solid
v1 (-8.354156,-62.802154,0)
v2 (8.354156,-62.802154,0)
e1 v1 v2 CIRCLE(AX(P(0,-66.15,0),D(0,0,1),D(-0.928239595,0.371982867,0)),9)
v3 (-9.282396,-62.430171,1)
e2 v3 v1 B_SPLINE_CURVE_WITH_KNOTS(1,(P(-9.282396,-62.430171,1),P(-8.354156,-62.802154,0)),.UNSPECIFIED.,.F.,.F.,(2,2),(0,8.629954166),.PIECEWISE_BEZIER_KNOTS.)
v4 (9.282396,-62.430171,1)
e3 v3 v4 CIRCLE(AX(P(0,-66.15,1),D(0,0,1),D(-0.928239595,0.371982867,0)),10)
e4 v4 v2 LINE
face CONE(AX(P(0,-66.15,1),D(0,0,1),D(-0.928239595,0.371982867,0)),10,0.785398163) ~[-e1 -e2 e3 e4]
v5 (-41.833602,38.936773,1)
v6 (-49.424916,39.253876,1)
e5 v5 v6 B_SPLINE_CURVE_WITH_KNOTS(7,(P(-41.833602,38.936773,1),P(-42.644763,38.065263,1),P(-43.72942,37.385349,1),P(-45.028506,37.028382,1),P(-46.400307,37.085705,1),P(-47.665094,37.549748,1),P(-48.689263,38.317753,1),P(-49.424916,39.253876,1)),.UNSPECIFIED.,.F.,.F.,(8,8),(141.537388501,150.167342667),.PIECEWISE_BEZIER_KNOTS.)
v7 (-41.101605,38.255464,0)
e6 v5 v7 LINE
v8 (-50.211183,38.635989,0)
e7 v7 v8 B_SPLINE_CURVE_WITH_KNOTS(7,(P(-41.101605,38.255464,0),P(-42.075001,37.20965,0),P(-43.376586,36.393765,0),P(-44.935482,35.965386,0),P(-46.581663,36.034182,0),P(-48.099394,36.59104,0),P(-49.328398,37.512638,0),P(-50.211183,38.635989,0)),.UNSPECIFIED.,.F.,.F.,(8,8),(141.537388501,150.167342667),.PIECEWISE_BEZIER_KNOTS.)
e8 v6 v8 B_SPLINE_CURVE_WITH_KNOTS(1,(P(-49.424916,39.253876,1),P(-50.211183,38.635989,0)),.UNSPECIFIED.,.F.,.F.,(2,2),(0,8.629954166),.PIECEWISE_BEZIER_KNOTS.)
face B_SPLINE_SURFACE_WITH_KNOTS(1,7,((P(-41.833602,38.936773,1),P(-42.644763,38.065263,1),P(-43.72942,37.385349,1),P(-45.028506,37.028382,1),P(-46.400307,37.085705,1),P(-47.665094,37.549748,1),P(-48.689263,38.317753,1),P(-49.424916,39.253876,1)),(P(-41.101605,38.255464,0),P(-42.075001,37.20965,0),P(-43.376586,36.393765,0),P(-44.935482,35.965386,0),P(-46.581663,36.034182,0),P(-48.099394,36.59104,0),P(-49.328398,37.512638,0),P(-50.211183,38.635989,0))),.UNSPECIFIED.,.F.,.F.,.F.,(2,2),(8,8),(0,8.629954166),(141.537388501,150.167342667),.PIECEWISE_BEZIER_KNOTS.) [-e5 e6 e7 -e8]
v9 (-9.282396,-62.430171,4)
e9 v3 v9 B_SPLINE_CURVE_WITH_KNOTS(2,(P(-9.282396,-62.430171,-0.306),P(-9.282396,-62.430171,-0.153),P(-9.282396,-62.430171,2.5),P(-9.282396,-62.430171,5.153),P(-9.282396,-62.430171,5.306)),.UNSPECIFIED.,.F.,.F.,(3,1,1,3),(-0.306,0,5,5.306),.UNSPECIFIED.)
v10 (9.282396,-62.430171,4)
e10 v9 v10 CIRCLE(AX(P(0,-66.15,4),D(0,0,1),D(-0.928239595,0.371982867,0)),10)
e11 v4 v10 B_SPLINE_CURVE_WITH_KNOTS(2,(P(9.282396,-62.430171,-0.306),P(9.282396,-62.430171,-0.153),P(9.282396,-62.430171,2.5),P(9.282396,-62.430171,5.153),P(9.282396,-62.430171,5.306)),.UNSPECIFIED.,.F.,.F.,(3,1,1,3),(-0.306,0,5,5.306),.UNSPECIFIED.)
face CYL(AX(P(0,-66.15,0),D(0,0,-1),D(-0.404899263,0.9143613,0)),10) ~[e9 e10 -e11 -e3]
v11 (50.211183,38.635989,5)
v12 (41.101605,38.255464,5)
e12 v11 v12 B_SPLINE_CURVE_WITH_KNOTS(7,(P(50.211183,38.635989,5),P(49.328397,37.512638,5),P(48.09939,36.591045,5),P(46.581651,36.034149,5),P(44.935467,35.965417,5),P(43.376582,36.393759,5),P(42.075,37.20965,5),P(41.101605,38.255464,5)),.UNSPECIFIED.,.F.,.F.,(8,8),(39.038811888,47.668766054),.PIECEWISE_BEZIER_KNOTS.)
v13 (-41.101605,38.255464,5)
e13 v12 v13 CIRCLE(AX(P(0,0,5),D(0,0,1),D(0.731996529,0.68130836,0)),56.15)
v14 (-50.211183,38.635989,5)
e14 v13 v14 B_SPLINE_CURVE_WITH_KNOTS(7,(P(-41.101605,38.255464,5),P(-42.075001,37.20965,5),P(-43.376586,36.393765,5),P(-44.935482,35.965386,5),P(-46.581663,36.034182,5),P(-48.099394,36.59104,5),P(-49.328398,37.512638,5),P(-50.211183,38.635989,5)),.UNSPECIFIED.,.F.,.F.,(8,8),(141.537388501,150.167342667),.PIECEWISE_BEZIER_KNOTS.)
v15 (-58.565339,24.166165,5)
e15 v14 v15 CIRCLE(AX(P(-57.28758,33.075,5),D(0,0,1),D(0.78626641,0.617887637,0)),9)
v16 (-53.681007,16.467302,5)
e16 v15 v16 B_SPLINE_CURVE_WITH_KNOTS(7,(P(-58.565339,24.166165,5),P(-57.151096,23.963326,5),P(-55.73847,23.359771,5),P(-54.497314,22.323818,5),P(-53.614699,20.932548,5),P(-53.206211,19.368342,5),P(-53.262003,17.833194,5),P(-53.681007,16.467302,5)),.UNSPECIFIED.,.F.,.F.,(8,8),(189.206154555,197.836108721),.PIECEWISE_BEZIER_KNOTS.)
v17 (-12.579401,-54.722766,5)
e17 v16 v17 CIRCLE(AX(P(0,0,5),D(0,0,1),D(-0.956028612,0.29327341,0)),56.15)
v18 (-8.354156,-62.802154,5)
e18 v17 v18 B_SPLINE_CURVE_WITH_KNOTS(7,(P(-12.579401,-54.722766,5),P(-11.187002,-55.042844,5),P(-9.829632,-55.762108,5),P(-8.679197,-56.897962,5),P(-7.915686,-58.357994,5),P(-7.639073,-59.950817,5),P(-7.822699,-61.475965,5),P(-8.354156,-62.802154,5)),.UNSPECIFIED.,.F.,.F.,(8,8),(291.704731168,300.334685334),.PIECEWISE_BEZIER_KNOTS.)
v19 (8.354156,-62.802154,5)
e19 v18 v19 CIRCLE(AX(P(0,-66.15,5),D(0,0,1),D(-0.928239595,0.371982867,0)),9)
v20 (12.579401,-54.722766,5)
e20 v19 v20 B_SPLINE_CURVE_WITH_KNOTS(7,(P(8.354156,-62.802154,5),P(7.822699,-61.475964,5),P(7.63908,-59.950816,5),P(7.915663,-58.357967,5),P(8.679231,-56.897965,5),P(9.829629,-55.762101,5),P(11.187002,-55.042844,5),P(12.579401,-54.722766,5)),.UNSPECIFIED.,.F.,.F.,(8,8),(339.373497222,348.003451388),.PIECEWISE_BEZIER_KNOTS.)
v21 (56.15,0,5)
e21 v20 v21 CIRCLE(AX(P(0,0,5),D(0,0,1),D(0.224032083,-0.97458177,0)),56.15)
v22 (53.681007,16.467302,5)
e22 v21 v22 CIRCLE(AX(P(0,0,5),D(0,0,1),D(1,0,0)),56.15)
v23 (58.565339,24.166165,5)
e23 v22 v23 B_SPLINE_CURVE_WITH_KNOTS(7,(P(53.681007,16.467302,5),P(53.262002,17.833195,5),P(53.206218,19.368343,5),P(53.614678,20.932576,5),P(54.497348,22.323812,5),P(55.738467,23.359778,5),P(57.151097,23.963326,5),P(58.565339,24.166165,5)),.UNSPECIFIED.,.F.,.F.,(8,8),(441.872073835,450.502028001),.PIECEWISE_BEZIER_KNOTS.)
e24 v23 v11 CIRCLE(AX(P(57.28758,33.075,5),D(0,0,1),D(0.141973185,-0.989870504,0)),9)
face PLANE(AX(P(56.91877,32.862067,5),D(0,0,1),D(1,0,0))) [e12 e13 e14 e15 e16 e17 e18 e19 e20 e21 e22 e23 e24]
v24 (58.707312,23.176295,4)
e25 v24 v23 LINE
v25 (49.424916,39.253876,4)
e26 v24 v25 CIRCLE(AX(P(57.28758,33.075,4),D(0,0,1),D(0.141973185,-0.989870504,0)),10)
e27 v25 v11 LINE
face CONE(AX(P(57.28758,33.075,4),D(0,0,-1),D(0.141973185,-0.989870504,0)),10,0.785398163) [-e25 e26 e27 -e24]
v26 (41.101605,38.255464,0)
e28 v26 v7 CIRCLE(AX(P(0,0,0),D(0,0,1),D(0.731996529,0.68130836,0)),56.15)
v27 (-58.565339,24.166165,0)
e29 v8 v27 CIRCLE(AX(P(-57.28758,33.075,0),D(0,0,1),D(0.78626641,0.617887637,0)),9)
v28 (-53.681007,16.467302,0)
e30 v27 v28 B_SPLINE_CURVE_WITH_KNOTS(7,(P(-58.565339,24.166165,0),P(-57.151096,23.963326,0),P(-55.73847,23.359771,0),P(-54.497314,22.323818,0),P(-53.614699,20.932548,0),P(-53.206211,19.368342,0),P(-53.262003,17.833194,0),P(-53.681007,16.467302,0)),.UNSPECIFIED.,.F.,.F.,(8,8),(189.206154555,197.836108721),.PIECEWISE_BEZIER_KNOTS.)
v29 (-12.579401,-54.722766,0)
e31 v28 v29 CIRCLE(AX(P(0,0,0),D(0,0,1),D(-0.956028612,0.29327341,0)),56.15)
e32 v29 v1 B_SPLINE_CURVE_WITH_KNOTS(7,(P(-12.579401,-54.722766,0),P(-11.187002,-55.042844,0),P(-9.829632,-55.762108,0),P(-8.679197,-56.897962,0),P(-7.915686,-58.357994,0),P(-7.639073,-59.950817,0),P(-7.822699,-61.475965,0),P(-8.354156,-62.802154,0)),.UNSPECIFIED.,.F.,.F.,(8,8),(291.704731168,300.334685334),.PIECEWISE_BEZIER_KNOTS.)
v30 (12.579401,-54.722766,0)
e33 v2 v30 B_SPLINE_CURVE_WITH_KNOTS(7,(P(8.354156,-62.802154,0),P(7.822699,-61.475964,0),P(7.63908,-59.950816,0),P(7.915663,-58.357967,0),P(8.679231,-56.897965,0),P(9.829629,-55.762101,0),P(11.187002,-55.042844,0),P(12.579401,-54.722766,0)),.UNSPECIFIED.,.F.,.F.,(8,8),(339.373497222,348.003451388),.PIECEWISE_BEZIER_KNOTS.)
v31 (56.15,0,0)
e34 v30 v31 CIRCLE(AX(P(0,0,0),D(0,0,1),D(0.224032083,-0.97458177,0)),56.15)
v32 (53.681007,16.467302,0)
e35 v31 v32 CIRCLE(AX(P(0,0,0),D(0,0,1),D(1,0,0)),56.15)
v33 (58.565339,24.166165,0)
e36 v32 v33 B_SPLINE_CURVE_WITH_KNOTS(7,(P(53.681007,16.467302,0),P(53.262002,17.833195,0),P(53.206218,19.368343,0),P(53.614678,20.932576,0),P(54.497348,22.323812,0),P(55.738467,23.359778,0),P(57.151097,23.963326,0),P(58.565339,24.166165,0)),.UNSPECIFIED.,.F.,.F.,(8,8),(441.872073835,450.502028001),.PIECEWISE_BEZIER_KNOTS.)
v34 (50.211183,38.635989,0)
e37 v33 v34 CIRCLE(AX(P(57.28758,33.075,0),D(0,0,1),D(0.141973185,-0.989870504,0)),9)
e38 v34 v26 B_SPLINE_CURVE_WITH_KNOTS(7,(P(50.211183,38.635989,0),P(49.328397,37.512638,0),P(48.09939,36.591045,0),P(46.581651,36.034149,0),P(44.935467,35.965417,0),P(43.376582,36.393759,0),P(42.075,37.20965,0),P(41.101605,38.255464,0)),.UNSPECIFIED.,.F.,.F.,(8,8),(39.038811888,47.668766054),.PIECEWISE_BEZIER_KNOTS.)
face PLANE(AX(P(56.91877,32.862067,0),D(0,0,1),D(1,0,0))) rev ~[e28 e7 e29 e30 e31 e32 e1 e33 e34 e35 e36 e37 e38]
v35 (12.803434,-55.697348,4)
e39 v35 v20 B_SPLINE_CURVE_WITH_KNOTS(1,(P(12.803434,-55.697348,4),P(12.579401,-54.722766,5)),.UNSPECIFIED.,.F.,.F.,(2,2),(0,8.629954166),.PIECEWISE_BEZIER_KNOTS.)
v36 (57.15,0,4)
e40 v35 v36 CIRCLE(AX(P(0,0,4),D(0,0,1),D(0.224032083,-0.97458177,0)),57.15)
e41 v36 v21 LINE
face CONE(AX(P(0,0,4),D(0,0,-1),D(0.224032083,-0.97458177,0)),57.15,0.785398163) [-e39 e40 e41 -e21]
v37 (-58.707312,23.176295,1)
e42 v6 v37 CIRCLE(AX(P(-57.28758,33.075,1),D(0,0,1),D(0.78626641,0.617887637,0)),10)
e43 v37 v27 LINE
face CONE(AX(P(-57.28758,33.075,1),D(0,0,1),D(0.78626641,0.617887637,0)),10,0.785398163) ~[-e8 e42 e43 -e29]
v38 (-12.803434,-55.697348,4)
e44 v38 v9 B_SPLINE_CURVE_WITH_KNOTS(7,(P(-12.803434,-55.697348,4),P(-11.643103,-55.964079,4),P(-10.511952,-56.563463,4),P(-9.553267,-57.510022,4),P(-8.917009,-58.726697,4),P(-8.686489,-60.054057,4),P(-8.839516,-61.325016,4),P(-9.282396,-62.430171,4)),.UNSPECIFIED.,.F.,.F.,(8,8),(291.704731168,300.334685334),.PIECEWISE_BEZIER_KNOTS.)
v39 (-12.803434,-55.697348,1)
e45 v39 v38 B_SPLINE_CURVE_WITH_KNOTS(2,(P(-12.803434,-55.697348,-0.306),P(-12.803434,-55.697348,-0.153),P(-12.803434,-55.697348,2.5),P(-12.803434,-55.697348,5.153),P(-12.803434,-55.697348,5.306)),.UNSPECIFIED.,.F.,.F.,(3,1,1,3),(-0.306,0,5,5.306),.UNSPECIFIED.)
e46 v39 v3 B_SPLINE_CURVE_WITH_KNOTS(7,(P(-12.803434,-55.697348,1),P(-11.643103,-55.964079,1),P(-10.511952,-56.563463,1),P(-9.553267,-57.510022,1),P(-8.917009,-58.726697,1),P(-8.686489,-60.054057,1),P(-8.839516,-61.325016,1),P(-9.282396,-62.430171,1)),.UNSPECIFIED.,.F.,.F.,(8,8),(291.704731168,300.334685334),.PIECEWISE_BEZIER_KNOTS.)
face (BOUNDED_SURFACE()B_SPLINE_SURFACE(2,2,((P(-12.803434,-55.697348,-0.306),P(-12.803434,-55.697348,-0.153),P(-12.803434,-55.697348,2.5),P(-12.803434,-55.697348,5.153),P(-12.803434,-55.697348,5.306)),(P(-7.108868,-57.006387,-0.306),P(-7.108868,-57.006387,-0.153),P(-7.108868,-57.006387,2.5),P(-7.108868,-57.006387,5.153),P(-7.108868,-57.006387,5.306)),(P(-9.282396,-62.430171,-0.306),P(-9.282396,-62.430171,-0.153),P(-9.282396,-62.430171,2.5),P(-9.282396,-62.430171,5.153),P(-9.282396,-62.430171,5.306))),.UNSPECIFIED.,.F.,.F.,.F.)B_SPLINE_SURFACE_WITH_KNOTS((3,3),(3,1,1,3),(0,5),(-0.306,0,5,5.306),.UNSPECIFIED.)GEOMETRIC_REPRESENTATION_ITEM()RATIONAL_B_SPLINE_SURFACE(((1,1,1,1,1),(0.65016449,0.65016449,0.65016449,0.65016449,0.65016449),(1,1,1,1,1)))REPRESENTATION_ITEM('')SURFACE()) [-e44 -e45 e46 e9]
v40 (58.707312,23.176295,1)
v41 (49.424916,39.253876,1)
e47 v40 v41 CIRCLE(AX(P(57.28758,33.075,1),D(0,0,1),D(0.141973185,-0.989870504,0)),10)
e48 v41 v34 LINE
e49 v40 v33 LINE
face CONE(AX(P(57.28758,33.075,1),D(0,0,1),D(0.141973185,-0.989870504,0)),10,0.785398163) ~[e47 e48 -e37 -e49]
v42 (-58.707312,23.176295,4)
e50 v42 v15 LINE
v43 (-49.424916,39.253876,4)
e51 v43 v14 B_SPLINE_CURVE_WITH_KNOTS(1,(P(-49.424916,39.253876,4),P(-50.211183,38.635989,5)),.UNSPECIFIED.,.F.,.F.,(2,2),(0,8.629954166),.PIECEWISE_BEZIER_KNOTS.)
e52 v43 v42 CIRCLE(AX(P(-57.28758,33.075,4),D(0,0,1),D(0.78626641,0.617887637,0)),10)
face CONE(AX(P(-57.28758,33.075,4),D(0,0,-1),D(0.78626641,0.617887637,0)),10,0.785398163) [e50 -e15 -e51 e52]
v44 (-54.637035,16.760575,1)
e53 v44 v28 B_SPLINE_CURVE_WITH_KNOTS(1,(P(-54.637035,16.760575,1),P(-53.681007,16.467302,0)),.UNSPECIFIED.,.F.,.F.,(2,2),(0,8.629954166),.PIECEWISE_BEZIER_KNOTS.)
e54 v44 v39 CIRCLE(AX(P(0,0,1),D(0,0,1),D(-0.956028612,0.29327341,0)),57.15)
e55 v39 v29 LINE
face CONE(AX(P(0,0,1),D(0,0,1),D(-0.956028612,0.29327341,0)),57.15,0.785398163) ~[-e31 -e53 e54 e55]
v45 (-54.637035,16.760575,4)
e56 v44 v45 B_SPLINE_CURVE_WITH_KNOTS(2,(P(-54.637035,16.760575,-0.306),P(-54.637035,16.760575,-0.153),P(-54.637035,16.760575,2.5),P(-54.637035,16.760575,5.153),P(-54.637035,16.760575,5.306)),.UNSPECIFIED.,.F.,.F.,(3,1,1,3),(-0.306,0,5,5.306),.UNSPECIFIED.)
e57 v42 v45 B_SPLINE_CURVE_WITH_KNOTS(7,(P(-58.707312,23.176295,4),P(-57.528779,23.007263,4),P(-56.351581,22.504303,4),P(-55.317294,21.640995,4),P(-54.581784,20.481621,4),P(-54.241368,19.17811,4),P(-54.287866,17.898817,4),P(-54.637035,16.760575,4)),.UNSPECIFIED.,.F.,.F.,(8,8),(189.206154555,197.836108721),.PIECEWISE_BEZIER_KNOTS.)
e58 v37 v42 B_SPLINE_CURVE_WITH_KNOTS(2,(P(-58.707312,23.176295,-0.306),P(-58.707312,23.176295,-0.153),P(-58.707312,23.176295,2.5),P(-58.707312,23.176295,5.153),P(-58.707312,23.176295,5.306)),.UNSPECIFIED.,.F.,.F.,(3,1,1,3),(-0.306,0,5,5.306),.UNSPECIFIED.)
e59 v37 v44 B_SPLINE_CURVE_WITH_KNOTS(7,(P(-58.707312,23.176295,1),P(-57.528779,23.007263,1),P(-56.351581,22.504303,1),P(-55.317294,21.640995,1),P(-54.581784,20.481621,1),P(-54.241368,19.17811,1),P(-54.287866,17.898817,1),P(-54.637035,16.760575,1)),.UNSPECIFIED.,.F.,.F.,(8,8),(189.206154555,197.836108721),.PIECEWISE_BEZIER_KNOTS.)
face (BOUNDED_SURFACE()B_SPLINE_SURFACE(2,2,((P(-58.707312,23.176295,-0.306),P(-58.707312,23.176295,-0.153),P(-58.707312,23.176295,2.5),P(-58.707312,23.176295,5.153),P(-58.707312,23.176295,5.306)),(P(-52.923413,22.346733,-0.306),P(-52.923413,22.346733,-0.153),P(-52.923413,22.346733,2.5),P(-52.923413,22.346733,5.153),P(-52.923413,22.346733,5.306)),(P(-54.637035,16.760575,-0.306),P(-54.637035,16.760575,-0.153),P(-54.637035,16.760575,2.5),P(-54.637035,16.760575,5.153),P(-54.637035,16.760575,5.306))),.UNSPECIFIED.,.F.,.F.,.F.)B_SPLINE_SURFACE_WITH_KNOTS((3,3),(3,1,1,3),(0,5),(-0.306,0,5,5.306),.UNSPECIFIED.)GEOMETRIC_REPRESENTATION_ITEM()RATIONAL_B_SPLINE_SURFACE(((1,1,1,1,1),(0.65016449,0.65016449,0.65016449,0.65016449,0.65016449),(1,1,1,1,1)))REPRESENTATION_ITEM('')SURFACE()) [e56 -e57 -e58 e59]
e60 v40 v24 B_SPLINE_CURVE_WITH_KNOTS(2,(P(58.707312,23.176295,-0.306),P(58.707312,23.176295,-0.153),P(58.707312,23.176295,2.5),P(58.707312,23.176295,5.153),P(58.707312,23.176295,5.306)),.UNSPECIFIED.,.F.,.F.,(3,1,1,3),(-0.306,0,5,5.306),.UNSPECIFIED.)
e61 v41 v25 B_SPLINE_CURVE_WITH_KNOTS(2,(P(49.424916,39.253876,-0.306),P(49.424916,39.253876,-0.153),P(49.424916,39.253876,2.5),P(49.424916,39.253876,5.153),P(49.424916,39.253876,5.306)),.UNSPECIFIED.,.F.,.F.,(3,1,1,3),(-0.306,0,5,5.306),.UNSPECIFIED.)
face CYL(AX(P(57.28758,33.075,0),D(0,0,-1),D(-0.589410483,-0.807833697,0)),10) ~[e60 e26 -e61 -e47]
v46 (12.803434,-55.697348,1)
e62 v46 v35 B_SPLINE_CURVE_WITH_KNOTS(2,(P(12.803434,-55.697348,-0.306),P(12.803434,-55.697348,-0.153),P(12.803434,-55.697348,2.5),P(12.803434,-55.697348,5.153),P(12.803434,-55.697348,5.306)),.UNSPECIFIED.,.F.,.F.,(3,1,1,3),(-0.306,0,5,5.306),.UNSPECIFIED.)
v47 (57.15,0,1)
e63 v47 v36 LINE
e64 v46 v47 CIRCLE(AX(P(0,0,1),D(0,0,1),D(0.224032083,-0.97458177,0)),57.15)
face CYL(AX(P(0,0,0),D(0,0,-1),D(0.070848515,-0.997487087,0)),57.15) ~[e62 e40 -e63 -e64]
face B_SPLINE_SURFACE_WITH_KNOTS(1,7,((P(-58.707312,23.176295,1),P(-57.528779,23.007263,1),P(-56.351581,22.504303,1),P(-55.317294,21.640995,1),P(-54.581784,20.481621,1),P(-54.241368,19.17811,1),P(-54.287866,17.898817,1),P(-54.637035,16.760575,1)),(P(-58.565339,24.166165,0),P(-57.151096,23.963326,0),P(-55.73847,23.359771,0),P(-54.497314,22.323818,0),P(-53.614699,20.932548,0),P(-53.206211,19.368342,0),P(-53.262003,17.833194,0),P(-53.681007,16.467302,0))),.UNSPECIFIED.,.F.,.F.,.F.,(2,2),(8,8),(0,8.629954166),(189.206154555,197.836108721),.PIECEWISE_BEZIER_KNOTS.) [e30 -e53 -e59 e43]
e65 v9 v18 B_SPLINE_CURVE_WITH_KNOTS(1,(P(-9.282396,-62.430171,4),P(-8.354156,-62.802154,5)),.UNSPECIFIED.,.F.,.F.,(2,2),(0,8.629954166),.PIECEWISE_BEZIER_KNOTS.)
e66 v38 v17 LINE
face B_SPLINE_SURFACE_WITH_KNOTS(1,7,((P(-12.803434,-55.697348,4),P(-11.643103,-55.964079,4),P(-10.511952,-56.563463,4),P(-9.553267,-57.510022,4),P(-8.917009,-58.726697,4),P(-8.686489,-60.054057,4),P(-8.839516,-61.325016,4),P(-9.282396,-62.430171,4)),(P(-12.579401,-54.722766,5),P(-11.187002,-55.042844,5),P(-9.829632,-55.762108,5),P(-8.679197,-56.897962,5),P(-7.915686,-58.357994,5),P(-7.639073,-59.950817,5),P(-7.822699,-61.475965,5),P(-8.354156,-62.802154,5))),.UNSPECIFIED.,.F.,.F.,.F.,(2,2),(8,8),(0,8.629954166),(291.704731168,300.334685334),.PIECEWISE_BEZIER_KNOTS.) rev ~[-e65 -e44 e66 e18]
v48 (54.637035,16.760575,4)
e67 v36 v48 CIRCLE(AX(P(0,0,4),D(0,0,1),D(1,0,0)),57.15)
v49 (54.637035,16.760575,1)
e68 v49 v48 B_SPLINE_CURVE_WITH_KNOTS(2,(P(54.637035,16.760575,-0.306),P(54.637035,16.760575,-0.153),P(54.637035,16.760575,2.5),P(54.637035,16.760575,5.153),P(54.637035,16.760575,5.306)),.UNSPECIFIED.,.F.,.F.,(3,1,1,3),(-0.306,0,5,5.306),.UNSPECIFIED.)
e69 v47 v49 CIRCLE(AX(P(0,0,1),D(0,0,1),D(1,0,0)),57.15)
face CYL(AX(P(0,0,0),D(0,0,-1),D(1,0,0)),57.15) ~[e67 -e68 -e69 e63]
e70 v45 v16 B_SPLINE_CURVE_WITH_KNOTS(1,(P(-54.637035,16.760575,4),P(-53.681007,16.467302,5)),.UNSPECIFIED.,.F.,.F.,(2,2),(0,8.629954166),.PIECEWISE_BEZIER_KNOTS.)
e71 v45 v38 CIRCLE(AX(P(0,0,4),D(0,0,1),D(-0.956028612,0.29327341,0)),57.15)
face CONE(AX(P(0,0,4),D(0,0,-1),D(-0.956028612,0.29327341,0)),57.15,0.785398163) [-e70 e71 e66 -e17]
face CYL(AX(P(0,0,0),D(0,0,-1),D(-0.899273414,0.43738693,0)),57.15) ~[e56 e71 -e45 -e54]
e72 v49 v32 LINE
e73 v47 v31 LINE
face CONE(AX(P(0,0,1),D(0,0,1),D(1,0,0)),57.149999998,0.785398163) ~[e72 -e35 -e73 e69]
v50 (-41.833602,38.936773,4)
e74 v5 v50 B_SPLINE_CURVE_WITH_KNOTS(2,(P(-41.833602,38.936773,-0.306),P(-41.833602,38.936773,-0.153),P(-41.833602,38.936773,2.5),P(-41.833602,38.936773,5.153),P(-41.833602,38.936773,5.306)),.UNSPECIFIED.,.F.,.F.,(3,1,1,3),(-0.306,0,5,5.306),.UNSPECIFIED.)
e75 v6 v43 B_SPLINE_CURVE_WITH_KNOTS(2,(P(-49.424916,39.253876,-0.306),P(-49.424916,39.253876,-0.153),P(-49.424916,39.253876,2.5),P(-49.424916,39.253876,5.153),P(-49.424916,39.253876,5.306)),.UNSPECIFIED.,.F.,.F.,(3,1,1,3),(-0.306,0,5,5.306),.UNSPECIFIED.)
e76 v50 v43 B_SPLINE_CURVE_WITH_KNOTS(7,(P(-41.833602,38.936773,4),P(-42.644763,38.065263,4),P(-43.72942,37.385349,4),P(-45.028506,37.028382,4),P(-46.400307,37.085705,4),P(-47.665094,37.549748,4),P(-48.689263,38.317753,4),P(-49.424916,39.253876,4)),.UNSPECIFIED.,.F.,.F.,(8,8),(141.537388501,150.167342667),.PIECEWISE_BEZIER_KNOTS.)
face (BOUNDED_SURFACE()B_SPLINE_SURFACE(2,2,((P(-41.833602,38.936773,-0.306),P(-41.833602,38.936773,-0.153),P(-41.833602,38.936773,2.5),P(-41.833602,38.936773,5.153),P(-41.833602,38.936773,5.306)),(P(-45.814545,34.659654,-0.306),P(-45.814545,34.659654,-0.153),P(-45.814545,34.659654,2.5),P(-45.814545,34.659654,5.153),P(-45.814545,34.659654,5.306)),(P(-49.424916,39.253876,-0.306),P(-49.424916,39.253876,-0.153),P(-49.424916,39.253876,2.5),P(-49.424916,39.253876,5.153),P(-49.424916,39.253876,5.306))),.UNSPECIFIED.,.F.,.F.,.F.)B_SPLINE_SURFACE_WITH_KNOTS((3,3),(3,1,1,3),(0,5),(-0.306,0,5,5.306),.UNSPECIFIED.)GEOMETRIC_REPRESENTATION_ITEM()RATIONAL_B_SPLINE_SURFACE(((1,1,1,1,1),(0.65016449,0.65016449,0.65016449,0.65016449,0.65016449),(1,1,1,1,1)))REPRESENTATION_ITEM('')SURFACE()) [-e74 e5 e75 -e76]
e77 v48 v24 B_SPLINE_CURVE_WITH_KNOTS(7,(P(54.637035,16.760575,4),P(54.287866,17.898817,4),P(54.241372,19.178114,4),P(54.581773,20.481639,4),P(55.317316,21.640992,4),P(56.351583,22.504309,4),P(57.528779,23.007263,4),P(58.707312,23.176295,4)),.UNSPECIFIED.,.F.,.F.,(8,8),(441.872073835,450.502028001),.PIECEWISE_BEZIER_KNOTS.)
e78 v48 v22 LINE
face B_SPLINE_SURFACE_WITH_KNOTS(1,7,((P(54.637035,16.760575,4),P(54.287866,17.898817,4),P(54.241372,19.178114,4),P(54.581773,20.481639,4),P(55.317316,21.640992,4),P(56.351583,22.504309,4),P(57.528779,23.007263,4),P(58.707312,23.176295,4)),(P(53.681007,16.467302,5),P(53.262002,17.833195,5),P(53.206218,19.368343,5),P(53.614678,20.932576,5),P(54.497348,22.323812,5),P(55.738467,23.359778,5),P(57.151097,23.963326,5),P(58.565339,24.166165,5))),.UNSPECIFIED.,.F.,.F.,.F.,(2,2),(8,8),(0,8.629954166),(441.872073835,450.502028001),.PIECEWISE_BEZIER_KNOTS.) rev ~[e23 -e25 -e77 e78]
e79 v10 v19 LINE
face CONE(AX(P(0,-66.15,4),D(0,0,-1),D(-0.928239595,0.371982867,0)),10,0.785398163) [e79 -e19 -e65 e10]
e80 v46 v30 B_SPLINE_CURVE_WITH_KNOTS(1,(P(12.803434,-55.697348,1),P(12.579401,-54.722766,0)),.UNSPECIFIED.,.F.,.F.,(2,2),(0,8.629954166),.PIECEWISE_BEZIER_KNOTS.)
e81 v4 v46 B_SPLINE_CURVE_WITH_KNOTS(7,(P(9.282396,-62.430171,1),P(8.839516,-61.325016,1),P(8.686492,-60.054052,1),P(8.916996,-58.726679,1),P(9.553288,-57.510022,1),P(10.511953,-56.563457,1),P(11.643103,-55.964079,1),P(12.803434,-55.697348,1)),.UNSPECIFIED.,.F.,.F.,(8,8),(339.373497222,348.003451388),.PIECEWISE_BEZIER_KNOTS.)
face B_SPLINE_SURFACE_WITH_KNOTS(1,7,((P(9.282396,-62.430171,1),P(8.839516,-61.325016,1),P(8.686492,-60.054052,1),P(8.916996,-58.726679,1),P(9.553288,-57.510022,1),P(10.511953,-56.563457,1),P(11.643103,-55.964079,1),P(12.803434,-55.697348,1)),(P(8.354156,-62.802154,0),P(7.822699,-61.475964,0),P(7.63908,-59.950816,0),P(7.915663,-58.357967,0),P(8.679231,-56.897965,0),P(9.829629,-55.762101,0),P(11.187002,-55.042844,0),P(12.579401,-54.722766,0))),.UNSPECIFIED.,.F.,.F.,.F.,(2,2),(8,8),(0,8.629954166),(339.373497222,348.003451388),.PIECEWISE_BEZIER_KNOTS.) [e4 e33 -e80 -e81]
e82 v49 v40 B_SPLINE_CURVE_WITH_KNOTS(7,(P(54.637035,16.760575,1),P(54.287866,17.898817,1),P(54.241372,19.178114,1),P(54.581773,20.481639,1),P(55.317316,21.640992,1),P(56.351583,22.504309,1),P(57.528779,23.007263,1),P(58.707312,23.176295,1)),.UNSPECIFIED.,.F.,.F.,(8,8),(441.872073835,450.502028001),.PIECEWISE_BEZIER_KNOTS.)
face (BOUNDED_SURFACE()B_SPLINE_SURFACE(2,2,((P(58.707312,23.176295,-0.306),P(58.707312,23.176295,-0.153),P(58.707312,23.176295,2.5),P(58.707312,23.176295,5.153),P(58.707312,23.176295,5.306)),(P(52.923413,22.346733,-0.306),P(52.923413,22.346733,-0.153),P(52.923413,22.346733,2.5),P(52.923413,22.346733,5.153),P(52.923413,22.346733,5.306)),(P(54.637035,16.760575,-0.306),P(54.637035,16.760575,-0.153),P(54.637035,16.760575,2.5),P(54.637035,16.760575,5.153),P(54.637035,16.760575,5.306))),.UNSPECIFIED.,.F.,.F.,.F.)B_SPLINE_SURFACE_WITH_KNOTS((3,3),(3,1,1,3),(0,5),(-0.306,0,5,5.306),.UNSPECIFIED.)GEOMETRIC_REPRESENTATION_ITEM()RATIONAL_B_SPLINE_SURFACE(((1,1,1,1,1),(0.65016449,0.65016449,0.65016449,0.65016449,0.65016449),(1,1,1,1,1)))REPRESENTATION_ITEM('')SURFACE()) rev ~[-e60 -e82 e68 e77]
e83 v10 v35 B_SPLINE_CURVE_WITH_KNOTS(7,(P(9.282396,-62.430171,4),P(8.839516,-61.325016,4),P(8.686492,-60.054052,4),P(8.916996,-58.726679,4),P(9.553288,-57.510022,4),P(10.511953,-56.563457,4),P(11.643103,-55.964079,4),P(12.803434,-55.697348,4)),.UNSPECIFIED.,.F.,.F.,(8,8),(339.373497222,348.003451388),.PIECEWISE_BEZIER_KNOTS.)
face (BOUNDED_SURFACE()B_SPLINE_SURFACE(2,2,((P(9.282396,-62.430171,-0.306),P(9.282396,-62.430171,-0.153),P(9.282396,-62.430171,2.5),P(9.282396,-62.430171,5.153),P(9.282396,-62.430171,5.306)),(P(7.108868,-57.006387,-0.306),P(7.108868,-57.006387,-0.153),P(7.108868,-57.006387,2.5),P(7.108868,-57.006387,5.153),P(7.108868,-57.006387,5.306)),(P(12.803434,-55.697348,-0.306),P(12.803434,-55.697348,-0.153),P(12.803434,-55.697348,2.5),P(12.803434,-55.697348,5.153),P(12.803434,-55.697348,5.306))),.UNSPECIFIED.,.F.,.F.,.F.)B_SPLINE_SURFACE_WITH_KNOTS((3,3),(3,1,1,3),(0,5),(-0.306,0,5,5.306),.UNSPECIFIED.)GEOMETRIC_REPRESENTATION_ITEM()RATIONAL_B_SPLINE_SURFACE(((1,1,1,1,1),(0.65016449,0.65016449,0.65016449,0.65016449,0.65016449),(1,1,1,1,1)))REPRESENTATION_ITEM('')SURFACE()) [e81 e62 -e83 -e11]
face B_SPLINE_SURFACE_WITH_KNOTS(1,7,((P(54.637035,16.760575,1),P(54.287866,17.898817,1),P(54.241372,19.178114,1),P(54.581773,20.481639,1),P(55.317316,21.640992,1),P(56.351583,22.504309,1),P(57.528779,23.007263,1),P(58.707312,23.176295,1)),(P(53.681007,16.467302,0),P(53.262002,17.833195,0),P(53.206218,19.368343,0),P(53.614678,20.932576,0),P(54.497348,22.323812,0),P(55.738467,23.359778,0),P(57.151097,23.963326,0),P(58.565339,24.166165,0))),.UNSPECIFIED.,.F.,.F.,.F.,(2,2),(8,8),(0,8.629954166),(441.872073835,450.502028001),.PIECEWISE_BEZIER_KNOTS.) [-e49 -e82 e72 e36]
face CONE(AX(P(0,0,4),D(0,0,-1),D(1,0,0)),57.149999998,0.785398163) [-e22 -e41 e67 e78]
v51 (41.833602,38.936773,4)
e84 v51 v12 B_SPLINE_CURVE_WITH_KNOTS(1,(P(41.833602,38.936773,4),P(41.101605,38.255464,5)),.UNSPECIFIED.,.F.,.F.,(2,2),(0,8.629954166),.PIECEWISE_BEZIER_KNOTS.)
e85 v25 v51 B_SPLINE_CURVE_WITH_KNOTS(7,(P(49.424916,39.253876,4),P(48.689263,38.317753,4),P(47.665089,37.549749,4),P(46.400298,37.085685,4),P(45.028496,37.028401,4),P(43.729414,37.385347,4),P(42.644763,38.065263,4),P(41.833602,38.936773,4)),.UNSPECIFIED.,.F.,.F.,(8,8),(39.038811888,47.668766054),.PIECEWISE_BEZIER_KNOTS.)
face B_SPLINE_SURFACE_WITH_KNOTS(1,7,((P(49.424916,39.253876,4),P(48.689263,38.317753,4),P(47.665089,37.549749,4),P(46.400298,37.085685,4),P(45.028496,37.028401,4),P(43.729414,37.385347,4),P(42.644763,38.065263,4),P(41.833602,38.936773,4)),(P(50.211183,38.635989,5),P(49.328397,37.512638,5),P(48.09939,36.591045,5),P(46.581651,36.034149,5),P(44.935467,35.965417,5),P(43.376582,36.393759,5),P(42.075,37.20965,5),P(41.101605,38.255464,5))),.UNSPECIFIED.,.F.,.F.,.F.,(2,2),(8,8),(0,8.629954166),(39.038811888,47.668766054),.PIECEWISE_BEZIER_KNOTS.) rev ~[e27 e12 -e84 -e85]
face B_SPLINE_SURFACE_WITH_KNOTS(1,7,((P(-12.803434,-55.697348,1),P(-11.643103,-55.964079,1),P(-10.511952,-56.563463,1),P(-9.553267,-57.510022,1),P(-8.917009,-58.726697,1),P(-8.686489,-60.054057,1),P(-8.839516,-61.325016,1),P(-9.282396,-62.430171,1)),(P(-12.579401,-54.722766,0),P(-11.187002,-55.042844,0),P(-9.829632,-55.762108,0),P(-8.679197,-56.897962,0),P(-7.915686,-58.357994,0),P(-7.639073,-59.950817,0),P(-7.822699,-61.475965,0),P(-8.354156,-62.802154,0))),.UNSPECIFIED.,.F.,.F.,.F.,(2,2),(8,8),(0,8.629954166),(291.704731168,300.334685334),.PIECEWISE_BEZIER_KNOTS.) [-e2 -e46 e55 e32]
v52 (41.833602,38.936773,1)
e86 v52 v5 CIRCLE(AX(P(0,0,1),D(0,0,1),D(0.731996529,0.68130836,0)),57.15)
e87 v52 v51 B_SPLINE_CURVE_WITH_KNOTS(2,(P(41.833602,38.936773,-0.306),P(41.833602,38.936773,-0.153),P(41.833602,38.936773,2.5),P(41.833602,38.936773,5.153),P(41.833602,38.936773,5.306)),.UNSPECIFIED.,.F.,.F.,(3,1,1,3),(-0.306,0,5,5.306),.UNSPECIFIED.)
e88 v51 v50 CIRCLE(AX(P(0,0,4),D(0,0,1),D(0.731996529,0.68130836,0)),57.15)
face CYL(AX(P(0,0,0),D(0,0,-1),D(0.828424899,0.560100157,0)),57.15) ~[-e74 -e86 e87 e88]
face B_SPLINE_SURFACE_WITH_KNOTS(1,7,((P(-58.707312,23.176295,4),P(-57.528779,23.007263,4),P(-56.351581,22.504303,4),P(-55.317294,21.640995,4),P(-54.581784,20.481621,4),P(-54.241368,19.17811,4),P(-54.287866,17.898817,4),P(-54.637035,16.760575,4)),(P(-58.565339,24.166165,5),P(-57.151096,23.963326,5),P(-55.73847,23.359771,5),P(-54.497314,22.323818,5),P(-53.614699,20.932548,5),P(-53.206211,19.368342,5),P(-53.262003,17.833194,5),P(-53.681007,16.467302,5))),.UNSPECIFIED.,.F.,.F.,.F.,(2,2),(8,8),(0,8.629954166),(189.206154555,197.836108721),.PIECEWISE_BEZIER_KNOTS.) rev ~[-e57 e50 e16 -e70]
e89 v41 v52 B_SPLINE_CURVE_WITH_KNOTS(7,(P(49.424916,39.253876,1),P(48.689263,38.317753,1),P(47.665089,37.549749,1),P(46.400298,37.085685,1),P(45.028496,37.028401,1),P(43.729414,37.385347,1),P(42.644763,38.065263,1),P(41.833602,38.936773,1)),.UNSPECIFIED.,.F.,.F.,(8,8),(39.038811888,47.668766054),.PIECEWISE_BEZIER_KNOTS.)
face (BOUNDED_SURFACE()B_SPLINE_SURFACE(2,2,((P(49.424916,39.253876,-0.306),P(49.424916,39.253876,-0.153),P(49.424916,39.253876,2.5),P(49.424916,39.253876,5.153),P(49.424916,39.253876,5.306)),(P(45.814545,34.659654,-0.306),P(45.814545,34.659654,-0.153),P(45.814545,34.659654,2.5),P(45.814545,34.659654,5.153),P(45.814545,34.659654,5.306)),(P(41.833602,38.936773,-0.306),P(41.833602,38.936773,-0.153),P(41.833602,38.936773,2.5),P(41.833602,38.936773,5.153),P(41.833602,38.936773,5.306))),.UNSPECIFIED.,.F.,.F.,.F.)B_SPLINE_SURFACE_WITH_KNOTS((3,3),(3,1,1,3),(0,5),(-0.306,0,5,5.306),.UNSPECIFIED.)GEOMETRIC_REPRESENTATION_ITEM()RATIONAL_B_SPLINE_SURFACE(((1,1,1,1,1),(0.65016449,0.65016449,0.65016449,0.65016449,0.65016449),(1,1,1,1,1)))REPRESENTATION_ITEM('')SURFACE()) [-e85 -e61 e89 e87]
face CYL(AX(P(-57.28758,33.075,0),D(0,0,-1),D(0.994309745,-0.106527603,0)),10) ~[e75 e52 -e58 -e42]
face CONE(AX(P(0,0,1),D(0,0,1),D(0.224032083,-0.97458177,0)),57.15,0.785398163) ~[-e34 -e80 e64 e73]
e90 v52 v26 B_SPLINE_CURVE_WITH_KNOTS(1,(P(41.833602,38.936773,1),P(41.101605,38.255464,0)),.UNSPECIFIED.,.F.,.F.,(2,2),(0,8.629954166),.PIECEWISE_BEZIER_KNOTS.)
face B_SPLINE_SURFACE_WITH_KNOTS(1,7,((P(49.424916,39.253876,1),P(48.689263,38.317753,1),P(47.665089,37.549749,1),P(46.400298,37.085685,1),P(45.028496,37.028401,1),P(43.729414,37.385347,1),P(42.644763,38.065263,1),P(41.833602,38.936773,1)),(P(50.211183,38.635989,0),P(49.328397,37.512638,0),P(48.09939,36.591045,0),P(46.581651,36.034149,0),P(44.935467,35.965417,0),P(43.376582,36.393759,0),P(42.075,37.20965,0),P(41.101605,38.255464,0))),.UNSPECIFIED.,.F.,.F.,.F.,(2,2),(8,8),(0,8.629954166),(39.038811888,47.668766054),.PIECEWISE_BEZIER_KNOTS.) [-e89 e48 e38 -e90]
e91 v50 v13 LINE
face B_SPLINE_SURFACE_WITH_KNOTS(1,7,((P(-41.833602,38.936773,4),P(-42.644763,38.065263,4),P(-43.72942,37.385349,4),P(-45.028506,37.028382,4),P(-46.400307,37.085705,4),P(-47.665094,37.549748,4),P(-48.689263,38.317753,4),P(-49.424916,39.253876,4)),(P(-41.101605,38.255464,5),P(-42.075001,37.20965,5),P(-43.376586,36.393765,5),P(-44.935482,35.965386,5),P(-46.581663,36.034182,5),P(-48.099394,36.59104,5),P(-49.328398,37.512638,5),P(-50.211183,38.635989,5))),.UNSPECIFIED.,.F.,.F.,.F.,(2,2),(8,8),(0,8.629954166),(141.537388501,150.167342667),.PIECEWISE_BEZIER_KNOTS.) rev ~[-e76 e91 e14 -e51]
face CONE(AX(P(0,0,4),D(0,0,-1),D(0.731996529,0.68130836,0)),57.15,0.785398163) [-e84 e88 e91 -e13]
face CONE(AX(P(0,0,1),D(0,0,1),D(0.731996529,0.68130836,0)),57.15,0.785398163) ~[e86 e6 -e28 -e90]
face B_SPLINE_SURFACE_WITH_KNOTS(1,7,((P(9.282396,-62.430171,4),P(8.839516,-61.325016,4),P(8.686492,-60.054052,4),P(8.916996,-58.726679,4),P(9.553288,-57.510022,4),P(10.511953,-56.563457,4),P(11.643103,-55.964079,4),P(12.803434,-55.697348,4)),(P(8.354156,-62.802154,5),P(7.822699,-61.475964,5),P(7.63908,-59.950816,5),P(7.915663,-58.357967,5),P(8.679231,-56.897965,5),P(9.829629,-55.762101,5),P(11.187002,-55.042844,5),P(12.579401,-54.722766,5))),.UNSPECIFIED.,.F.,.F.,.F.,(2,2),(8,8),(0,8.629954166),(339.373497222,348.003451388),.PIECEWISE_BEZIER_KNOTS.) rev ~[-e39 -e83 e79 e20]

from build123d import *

# Parameters (mm, degrees)
F1_DEPTH = 5
F2_R     = 5
F3_SIZE  = 1


with BuildPart() as f1:
    # F0 (on Top) → F1 (new body)
    with BuildSketch(Plane.XY):
        with BuildLine():
            ThreePointArc((47.3444830059, 32.0097239742), (49.4933518263, 28.575), (51.3934756327, 24.996663025))
            ThreePointArc((51.3934756327, 24.996663025), (65.9478344982, 38.075), (47.3444830059, 32.0097239742))
        make_face()
        with BuildLine():
            ThreePointArc((4.0489926269, -57.0063869992), (41.8181923846, -38.9533218826), (57.15, 0))
            ThreePointArc((57.15, 0), (55.6922778867, 12.8254701198), (51.3934756327, 24.996663025))
            ThreePointArc((51.3934756327, 24.996663025), (49.4933518263, 28.575), (47.3444830059, 32.0097239742))
            ThreePointArc((47.3444830059, 32.0097239742), (0, 57.15), (-47.3444830059, 32.0097239742))
            ThreePointArc((-47.3444830059, 32.0097239742), (-49.4933518263, 28.575), (-51.3934756327, 24.996663025))
            ThreePointArc((-51.3934756327, 24.996663025), (-49.4933518263, -28.575), (-4.0489926269, -57.0063869992))
            ThreePointArc((-4.0489926269, -57.0063869992), (0, -57.15), (4.0489926269, -57.0063869992))
        make_face()
        with BuildLine():
            ThreePointArc((-51.3934756327, 24.996663025), (-49.4933518263, 28.575), (-47.3444830059, 32.0097239742))
            ThreePointArc((-47.3444830059, 32.0097239742), (-65.9478344982, 38.075), (-51.3934756327, 24.996663025))
        make_face()
        with BuildLine():
            ThreePointArc((-4.0489926269, -57.0063869992), (0, -76.15), (4.0489926269, -57.0063869992))
            ThreePointArc((4.0489926269, -57.0063869992), (0, -57.15), (-4.0489926269, -57.0063869992))
        make_face()
    extrude(amount=F1_DEPTH)

    # F2
    f2_edges = [f1.edges().sort_by_distance(p)[0] for p in [
        (-4.048993, -57.006387, 2.5),
        (-47.344483, 32.009724, 2.5),
        (51.393476, 24.996663, 2.5),
        (47.344483, 32.009724, 2.5),
        (-51.393476, 24.996663, 2.5),
        (4.048993, -57.006387, 2.5),
    ]]
    fillet(f2_edges, radius=F2_R)

    # F3
    f3_edges = [f1.edges().sort_by_distance(p)[0] for p in [
        (65.947834, 38.075, 5),
        (55.195163, 20.905484, 5),
        (45.702262, 37.347671, 5),
        (49.493352, -28.575, 5),
        (0, 57.15, 5),
        (9.492901, -58.253155, 5),
        (-45.702262, 37.347671, 5),
        (0, -76.15, 5),
        (-65.947834, 38.075, 5),
        (-9.492901, -58.253155, 5),
        (-55.195163, 20.905484, 5),
        (-49.493352, -28.575, 5),
        (65.947834, 38.075, 0),
        (55.195163, 20.905484, 0),
        (45.702262, 37.347671, 0),
        (49.493352, -28.575, 0),
        (0, 57.15, 0),
        (9.492901, -58.253155, 0),
        (-45.702262, 37.347671, 0),
        (0, -76.15, 0),
        (-65.947834, 38.075, 0),
        (-9.492901, -58.253155, 0),
        (-55.195163, 20.905484, 0),
        (-49.493352, -28.575, 0),
    ]]
    chamfer(f3_edges, length=F3_SIZE)


solid = f1.part
